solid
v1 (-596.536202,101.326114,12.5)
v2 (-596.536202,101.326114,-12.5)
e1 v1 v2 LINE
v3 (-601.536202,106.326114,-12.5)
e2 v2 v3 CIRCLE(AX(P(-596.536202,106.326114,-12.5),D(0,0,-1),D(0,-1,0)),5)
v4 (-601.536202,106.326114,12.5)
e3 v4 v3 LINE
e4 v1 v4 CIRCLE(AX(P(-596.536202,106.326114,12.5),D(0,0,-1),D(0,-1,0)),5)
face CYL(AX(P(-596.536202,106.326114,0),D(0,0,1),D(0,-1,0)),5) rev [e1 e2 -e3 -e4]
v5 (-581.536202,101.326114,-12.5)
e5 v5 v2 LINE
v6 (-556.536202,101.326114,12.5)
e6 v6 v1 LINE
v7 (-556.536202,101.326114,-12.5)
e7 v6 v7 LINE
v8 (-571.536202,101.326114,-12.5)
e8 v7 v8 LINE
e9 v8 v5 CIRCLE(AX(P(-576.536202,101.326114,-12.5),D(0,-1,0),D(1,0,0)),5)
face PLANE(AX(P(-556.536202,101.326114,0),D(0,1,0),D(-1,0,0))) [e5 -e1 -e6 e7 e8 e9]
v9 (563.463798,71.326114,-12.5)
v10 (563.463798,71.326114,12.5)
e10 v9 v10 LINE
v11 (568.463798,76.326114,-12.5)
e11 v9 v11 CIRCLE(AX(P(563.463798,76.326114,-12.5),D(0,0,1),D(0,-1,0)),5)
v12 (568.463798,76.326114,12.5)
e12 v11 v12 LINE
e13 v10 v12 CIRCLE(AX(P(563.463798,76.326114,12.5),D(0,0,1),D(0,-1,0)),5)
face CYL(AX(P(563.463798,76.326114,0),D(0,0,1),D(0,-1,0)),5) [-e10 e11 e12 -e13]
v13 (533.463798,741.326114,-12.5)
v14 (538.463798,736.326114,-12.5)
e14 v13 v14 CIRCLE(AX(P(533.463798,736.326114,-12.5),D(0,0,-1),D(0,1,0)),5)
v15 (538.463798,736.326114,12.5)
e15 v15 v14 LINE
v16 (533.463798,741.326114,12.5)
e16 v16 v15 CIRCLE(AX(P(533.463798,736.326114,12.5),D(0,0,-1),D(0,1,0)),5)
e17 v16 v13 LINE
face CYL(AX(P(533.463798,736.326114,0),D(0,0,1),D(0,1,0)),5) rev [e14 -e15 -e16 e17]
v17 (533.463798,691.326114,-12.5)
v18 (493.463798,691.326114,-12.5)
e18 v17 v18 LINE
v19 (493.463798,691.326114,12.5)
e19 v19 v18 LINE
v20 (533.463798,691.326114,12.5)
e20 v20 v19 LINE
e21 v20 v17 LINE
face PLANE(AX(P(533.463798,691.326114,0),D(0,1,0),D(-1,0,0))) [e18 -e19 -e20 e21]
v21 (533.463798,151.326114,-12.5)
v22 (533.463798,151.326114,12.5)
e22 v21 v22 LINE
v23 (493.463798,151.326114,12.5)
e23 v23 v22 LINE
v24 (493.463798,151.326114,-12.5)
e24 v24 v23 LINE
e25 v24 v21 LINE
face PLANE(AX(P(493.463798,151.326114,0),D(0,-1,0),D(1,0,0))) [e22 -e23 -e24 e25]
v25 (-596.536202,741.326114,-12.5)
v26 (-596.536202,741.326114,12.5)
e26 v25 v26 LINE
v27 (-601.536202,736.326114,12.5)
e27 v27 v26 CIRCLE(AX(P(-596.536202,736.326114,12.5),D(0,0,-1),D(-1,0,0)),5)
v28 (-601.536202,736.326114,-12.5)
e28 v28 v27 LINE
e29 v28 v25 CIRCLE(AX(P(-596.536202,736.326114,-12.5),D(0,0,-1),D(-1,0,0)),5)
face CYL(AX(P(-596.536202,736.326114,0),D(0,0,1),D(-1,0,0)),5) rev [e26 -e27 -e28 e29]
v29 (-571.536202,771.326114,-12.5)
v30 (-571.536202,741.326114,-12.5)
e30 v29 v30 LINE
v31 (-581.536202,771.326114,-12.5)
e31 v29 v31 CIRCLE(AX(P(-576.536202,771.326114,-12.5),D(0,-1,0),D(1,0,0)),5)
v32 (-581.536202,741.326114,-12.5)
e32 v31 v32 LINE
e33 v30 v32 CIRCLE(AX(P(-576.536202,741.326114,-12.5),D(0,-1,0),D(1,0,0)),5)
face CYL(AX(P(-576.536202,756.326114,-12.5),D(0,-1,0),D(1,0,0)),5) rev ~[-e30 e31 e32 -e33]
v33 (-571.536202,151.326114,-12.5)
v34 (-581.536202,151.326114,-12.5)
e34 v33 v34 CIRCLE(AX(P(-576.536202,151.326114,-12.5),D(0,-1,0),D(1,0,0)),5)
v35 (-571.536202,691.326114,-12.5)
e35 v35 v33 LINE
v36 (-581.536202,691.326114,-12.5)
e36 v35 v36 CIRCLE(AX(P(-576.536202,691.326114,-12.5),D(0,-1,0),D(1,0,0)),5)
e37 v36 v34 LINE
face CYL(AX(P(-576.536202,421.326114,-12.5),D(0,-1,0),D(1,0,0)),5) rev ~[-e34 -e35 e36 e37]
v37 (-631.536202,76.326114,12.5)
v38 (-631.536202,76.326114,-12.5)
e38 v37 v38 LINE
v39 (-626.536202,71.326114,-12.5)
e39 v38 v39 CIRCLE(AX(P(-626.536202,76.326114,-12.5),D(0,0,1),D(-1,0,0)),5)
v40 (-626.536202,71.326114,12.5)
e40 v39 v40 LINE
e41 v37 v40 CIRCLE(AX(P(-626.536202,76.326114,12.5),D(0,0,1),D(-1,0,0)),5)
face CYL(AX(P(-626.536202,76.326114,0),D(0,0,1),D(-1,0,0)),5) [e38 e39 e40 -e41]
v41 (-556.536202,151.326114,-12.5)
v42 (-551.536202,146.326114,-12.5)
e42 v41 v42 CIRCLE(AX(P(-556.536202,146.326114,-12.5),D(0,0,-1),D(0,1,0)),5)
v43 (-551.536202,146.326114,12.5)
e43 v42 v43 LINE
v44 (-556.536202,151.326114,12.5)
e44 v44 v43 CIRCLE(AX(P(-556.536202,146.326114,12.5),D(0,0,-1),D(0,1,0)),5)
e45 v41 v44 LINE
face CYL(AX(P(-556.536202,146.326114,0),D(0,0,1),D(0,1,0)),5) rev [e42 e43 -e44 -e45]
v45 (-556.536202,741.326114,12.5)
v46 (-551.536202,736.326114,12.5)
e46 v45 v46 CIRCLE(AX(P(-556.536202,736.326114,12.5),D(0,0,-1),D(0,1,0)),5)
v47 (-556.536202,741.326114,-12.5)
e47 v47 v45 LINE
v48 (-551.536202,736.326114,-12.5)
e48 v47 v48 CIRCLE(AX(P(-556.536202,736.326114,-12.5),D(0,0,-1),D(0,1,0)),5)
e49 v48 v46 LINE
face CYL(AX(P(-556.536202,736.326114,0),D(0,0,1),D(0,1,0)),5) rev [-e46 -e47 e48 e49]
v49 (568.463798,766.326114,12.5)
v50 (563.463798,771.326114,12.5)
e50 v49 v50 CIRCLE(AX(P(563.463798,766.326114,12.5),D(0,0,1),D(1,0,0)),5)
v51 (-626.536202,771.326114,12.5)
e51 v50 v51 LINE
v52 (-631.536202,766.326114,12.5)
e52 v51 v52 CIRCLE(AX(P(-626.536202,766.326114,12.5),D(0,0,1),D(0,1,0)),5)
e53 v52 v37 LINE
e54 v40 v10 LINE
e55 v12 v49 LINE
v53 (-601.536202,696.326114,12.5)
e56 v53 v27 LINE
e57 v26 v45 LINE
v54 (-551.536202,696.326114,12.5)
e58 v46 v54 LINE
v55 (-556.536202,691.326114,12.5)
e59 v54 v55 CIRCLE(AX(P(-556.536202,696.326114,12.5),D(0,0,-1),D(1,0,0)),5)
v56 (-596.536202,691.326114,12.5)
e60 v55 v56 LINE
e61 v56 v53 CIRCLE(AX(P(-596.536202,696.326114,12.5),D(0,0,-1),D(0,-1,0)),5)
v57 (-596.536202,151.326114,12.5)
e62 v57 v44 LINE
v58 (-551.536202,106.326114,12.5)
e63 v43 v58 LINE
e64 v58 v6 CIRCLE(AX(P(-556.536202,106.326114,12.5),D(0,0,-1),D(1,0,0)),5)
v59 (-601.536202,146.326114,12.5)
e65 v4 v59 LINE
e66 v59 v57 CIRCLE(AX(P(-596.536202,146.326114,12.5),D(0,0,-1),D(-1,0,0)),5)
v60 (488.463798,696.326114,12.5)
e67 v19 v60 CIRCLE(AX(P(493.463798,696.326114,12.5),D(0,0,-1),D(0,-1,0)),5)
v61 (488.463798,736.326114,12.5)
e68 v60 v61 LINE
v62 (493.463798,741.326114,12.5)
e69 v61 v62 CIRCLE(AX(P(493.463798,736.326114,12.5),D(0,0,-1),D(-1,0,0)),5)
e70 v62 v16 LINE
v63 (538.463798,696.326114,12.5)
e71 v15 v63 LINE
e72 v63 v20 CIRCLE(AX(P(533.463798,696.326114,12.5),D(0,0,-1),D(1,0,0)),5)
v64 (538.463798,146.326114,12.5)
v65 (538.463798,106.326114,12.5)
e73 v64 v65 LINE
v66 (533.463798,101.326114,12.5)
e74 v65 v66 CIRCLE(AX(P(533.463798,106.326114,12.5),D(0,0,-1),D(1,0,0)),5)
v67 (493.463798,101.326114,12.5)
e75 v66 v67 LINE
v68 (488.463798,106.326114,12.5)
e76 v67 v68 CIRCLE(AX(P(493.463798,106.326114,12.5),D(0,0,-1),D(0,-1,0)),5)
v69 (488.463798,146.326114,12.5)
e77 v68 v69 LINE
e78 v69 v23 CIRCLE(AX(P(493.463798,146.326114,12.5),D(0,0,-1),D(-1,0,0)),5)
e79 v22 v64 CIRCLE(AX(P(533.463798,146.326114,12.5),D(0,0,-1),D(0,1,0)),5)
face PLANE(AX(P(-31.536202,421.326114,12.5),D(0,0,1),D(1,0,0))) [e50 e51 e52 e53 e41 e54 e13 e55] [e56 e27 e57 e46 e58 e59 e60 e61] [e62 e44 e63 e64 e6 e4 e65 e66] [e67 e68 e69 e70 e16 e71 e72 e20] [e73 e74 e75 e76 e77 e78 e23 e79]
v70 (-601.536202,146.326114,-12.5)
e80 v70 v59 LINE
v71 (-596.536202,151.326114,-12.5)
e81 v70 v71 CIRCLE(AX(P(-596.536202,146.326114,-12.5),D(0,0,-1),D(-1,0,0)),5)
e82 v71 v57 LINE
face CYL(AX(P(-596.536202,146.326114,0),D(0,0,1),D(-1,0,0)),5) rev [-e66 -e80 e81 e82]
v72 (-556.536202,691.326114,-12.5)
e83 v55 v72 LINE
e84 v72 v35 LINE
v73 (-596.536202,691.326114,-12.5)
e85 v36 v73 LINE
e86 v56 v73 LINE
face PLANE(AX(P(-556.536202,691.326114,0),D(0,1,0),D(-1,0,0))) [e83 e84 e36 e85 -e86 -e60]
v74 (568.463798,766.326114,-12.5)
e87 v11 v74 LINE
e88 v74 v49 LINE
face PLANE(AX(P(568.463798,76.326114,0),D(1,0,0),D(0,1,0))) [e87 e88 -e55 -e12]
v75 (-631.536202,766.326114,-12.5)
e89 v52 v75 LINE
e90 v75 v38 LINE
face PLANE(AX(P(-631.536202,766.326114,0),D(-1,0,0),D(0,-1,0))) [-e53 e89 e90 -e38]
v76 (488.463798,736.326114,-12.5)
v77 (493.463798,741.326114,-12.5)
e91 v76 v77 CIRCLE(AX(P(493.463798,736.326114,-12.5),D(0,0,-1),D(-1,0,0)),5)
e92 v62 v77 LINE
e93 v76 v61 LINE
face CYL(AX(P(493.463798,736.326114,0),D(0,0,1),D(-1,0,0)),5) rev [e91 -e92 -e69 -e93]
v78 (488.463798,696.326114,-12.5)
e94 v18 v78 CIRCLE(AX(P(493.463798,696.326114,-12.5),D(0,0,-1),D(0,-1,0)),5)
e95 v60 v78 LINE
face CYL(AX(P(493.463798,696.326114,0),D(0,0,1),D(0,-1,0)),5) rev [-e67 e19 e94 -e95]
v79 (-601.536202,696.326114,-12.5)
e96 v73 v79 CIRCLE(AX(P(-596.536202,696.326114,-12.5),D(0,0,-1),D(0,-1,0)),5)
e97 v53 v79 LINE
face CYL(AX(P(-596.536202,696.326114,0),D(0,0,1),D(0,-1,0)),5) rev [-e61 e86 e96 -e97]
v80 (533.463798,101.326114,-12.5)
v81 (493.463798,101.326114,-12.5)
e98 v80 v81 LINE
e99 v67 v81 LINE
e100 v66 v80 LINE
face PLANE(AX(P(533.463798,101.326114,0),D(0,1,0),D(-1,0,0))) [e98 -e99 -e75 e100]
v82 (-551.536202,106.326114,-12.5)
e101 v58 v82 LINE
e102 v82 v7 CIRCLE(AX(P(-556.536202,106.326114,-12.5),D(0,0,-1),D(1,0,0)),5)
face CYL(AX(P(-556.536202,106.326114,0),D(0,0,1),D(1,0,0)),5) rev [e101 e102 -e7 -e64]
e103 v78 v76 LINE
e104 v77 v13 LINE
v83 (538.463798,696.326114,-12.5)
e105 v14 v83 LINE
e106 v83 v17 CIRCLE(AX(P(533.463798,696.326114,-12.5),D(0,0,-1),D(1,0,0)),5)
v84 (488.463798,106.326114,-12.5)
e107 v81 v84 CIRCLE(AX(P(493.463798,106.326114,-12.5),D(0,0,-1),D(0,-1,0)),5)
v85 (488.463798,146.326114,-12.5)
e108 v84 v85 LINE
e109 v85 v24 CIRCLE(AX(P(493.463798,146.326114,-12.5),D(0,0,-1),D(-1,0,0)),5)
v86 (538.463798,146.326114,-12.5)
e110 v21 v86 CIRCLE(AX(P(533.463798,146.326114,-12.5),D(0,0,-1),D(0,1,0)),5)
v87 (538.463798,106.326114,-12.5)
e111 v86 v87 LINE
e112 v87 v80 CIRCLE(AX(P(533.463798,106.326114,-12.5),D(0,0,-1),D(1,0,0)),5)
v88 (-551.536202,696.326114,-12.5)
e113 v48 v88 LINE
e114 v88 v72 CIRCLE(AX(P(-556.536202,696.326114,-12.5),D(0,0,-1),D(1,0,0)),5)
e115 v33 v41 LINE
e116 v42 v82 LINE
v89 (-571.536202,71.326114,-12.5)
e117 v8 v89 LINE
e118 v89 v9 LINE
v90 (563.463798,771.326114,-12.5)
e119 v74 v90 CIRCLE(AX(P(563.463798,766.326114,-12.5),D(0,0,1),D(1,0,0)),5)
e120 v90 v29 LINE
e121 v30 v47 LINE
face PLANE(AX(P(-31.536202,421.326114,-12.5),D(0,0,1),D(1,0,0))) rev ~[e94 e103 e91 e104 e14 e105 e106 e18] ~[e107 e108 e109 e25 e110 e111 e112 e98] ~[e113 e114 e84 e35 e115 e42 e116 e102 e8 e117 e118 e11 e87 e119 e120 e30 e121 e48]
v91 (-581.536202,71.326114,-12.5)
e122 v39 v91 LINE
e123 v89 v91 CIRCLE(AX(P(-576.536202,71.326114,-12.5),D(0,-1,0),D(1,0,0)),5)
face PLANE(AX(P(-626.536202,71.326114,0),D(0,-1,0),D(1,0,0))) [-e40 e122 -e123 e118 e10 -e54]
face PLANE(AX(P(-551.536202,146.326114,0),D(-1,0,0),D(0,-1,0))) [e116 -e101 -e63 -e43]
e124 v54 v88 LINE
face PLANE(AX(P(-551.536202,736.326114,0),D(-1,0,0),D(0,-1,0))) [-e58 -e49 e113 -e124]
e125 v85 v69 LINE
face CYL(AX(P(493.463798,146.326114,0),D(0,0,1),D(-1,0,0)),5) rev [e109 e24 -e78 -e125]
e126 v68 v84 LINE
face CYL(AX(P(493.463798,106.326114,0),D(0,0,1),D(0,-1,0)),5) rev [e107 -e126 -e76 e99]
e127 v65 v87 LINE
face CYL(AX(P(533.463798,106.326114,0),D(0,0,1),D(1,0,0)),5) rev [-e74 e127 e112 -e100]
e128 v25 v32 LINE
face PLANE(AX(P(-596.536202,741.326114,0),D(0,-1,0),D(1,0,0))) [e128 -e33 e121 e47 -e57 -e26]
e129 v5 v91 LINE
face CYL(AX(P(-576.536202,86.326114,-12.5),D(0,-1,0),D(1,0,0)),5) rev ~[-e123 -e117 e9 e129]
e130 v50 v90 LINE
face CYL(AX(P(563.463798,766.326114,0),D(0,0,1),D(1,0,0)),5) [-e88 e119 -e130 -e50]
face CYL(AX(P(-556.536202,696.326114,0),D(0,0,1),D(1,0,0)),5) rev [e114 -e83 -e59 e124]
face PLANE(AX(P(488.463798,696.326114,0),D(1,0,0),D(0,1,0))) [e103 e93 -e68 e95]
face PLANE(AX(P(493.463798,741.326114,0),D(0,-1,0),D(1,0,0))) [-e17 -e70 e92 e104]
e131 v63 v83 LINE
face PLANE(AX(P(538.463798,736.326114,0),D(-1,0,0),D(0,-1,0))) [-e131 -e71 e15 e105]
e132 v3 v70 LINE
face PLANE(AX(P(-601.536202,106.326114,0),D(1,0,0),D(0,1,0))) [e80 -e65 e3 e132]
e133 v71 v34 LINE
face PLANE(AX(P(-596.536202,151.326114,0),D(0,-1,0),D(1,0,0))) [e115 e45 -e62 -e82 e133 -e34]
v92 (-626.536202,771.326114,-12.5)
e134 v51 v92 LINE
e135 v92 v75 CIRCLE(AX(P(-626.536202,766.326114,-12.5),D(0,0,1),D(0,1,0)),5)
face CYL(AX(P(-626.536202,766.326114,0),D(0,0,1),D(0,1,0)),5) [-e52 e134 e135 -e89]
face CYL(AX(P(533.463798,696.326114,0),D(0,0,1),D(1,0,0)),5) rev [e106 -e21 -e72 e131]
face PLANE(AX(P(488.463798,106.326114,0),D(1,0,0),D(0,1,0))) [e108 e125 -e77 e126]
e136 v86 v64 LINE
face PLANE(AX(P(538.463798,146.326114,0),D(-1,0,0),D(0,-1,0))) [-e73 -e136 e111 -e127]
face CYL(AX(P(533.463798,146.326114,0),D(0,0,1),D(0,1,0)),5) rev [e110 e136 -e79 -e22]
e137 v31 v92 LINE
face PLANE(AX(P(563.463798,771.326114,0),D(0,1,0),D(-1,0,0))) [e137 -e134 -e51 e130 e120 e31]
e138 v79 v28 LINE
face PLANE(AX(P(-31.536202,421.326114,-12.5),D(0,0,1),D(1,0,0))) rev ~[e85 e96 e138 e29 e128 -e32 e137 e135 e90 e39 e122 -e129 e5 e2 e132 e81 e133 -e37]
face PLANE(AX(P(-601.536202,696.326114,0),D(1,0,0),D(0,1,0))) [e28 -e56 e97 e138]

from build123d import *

# Parameters (mm, degrees)
F1_DEPTH = 12.5
F2_W     = 5
F2_H     = 30
F2_H_2   = 540


with BuildPart() as f1:
    # F0 (on Top) → F1 (new body, symmetric)
    with BuildSketch(Plane.XY):
        with BuildLine():
            ThreePointArc((-631.5362024307, 76.3261139393), (-630.0717363367, 72.7905800334), (-626.5362024307, 71.3261139393))
            Line((-626.5362024307, 71.3261139393), (563.4637975693, 71.3261139393))
            ThreePointArc((563.4637975693, 71.3261139393), (566.9993314752, 72.7905800334), (568.4637975693, 76.3261139393))
            Line((568.4637975693, 76.3261139393), (568.4637975693, 766.3261139393))
            ThreePointArc((568.4637975693, 766.3261139393), (566.9993314752, 769.8616478452), (563.4637975693, 771.3261139393))
            Line((563.4637975693, 771.3261139393), (-626.5362024307, 771.3261139393))
            ThreePointArc((-626.5362024307, 771.3261139393), (-630.0717363367, 769.8616478452), (-631.5362024307, 766.3261139393))
            Line((-631.5362024307, 766.3261139393), (-631.5362024307, 76.3261139393))
        make_face()
        with BuildLine():
            ThreePointArc((-601.5362024307, 146.3261139393), (-600.0717363367, 149.8616478452), (-596.5362024307, 151.3261139393))
            Line((-596.5362024307, 151.3261139393), (-556.5362024307, 151.3261139393))
            ThreePointArc((-556.5362024307, 151.3261139393), (-553.0006685248, 149.8616478452), (-551.5362024307, 146.3261139393))
            Line((-551.5362024307, 146.3261139393), (-551.5362024307, 106.3261139393))
            ThreePointArc((-551.5362024307, 106.3261139393), (-553.0006685248, 102.7905800334), (-556.5362024307, 101.3261139393))
            Line((-556.5362024307, 101.3261139393), (-596.5362024307, 101.3261139393))
            ThreePointArc((-596.5362024307, 101.3261139393), (-600.0717363367, 102.7905800334), (-601.5362024307, 106.3261139393))
            Line((-601.5362024307, 106.3261139393), (-601.5362024307, 146.3261139393))
        make_face(mode=Mode.SUBTRACT)
        with BuildLine():
            ThreePointArc((488.4637975693, 146.3261139393), (489.9282636633, 149.8616478452), (493.4637975693, 151.3261139393))
            Line((493.4637975693, 151.3261139393), (533.4637975693, 151.3261139393))
            ThreePointArc((533.4637975693, 151.3261139393), (536.9993314752, 149.8616478452), (538.4637975693, 146.3261139393))
            Line((538.4637975693, 146.3261139393), (538.4637975693, 106.3261139393))
            ThreePointArc((538.4637975693, 106.3261139393), (536.9993314752, 102.7905800334), (533.4637975693, 101.3261139393))
            Line((533.4637975693, 101.3261139393), (493.4637975693, 101.3261139393))
            ThreePointArc((493.4637975693, 101.3261139393), (489.9282636633, 102.7905800334), (488.4637975693, 106.3261139393))
            Line((488.4637975693, 106.3261139393), (488.4637975693, 146.3261139393))
        make_face(mode=Mode.SUBTRACT)
        with BuildLine():
            ThreePointArc((-601.5362024307, 736.3261139393), (-600.0717363367, 739.8616478452), (-596.5362024307, 741.3261139393))
            Line((-596.5362024307, 741.3261139393), (-556.5362024307, 741.3261139393))
            ThreePointArc((-556.5362024307, 741.3261139393), (-553.0006685248, 739.8616478452), (-551.5362024307, 736.3261139393))
            Line((-551.5362024307, 736.3261139393), (-551.5362024307, 696.3261139393))
            ThreePointArc((-551.5362024307, 696.3261139393), (-553.0006685248, 692.7905800334), (-556.5362024307, 691.3261139393))
            Line((-556.5362024307, 691.3261139393), (-596.5362024307, 691.3261139393))
            ThreePointArc((-596.5362024307, 691.3261139393), (-600.0717363367, 692.7905800334), (-601.5362024307, 696.3261139393))
            Line((-601.5362024307, 696.3261139393), (-601.5362024307, 736.3261139393))
        make_face(mode=Mode.SUBTRACT)
        with BuildLine():
            ThreePointArc((488.4637975693, 736.3261139393), (489.9282636633, 739.8616478452), (493.4637975693, 741.3261139393))
            Line((493.4637975693, 741.3261139393), (533.4637975693, 741.3261139393))
            ThreePointArc((533.4637975693, 741.3261139393), (536.9993314752, 739.8616478452), (538.4637975693, 736.3261139393))
            Line((538.4637975693, 736.3261139393), (538.4637975693, 696.3261139393))
            ThreePointArc((538.4637975693, 696.3261139393), (536.9993314752, 692.7905800334), (533.4637975693, 691.3261139393))
            Line((533.4637975693, 691.3261139393), (493.4637975693, 691.3261139393))
            ThreePointArc((493.4637975693, 691.3261139393), (489.9282636633, 692.7905800334), (488.4637975693, 696.3261139393))
            Line((488.4637975693, 696.3261139393), (488.4637975693, 736.3261139393))
        make_face(mode=Mode.SUBTRACT)
    extrude(amount=F1_DEPTH, both=True)

    # F2 (on face) → F3 (revolve, cut)
    with BuildSketch(Plane(origin=(0, 0, -12.5), x_dir=(1, 0, 0), z_dir=(0, 0, -1))):
        with Locations((-574.0362024307, -86.3261139393)):
            Rectangle(F2_W, F2_H)
        with Locations((-574.0362024307, -421.3261139393)):
            Rectangle(F2_W, F2_H_2)
        with Locations((-574.0362024307, -756.3261139393)):
            Rectangle(F2_W, F2_H)
    revolve(axis=Axis((-576.5362024307, 421.3261139393, -12.5), (0, -1, 0)), mode=Mode.SUBTRACT)


solid = f1.part
